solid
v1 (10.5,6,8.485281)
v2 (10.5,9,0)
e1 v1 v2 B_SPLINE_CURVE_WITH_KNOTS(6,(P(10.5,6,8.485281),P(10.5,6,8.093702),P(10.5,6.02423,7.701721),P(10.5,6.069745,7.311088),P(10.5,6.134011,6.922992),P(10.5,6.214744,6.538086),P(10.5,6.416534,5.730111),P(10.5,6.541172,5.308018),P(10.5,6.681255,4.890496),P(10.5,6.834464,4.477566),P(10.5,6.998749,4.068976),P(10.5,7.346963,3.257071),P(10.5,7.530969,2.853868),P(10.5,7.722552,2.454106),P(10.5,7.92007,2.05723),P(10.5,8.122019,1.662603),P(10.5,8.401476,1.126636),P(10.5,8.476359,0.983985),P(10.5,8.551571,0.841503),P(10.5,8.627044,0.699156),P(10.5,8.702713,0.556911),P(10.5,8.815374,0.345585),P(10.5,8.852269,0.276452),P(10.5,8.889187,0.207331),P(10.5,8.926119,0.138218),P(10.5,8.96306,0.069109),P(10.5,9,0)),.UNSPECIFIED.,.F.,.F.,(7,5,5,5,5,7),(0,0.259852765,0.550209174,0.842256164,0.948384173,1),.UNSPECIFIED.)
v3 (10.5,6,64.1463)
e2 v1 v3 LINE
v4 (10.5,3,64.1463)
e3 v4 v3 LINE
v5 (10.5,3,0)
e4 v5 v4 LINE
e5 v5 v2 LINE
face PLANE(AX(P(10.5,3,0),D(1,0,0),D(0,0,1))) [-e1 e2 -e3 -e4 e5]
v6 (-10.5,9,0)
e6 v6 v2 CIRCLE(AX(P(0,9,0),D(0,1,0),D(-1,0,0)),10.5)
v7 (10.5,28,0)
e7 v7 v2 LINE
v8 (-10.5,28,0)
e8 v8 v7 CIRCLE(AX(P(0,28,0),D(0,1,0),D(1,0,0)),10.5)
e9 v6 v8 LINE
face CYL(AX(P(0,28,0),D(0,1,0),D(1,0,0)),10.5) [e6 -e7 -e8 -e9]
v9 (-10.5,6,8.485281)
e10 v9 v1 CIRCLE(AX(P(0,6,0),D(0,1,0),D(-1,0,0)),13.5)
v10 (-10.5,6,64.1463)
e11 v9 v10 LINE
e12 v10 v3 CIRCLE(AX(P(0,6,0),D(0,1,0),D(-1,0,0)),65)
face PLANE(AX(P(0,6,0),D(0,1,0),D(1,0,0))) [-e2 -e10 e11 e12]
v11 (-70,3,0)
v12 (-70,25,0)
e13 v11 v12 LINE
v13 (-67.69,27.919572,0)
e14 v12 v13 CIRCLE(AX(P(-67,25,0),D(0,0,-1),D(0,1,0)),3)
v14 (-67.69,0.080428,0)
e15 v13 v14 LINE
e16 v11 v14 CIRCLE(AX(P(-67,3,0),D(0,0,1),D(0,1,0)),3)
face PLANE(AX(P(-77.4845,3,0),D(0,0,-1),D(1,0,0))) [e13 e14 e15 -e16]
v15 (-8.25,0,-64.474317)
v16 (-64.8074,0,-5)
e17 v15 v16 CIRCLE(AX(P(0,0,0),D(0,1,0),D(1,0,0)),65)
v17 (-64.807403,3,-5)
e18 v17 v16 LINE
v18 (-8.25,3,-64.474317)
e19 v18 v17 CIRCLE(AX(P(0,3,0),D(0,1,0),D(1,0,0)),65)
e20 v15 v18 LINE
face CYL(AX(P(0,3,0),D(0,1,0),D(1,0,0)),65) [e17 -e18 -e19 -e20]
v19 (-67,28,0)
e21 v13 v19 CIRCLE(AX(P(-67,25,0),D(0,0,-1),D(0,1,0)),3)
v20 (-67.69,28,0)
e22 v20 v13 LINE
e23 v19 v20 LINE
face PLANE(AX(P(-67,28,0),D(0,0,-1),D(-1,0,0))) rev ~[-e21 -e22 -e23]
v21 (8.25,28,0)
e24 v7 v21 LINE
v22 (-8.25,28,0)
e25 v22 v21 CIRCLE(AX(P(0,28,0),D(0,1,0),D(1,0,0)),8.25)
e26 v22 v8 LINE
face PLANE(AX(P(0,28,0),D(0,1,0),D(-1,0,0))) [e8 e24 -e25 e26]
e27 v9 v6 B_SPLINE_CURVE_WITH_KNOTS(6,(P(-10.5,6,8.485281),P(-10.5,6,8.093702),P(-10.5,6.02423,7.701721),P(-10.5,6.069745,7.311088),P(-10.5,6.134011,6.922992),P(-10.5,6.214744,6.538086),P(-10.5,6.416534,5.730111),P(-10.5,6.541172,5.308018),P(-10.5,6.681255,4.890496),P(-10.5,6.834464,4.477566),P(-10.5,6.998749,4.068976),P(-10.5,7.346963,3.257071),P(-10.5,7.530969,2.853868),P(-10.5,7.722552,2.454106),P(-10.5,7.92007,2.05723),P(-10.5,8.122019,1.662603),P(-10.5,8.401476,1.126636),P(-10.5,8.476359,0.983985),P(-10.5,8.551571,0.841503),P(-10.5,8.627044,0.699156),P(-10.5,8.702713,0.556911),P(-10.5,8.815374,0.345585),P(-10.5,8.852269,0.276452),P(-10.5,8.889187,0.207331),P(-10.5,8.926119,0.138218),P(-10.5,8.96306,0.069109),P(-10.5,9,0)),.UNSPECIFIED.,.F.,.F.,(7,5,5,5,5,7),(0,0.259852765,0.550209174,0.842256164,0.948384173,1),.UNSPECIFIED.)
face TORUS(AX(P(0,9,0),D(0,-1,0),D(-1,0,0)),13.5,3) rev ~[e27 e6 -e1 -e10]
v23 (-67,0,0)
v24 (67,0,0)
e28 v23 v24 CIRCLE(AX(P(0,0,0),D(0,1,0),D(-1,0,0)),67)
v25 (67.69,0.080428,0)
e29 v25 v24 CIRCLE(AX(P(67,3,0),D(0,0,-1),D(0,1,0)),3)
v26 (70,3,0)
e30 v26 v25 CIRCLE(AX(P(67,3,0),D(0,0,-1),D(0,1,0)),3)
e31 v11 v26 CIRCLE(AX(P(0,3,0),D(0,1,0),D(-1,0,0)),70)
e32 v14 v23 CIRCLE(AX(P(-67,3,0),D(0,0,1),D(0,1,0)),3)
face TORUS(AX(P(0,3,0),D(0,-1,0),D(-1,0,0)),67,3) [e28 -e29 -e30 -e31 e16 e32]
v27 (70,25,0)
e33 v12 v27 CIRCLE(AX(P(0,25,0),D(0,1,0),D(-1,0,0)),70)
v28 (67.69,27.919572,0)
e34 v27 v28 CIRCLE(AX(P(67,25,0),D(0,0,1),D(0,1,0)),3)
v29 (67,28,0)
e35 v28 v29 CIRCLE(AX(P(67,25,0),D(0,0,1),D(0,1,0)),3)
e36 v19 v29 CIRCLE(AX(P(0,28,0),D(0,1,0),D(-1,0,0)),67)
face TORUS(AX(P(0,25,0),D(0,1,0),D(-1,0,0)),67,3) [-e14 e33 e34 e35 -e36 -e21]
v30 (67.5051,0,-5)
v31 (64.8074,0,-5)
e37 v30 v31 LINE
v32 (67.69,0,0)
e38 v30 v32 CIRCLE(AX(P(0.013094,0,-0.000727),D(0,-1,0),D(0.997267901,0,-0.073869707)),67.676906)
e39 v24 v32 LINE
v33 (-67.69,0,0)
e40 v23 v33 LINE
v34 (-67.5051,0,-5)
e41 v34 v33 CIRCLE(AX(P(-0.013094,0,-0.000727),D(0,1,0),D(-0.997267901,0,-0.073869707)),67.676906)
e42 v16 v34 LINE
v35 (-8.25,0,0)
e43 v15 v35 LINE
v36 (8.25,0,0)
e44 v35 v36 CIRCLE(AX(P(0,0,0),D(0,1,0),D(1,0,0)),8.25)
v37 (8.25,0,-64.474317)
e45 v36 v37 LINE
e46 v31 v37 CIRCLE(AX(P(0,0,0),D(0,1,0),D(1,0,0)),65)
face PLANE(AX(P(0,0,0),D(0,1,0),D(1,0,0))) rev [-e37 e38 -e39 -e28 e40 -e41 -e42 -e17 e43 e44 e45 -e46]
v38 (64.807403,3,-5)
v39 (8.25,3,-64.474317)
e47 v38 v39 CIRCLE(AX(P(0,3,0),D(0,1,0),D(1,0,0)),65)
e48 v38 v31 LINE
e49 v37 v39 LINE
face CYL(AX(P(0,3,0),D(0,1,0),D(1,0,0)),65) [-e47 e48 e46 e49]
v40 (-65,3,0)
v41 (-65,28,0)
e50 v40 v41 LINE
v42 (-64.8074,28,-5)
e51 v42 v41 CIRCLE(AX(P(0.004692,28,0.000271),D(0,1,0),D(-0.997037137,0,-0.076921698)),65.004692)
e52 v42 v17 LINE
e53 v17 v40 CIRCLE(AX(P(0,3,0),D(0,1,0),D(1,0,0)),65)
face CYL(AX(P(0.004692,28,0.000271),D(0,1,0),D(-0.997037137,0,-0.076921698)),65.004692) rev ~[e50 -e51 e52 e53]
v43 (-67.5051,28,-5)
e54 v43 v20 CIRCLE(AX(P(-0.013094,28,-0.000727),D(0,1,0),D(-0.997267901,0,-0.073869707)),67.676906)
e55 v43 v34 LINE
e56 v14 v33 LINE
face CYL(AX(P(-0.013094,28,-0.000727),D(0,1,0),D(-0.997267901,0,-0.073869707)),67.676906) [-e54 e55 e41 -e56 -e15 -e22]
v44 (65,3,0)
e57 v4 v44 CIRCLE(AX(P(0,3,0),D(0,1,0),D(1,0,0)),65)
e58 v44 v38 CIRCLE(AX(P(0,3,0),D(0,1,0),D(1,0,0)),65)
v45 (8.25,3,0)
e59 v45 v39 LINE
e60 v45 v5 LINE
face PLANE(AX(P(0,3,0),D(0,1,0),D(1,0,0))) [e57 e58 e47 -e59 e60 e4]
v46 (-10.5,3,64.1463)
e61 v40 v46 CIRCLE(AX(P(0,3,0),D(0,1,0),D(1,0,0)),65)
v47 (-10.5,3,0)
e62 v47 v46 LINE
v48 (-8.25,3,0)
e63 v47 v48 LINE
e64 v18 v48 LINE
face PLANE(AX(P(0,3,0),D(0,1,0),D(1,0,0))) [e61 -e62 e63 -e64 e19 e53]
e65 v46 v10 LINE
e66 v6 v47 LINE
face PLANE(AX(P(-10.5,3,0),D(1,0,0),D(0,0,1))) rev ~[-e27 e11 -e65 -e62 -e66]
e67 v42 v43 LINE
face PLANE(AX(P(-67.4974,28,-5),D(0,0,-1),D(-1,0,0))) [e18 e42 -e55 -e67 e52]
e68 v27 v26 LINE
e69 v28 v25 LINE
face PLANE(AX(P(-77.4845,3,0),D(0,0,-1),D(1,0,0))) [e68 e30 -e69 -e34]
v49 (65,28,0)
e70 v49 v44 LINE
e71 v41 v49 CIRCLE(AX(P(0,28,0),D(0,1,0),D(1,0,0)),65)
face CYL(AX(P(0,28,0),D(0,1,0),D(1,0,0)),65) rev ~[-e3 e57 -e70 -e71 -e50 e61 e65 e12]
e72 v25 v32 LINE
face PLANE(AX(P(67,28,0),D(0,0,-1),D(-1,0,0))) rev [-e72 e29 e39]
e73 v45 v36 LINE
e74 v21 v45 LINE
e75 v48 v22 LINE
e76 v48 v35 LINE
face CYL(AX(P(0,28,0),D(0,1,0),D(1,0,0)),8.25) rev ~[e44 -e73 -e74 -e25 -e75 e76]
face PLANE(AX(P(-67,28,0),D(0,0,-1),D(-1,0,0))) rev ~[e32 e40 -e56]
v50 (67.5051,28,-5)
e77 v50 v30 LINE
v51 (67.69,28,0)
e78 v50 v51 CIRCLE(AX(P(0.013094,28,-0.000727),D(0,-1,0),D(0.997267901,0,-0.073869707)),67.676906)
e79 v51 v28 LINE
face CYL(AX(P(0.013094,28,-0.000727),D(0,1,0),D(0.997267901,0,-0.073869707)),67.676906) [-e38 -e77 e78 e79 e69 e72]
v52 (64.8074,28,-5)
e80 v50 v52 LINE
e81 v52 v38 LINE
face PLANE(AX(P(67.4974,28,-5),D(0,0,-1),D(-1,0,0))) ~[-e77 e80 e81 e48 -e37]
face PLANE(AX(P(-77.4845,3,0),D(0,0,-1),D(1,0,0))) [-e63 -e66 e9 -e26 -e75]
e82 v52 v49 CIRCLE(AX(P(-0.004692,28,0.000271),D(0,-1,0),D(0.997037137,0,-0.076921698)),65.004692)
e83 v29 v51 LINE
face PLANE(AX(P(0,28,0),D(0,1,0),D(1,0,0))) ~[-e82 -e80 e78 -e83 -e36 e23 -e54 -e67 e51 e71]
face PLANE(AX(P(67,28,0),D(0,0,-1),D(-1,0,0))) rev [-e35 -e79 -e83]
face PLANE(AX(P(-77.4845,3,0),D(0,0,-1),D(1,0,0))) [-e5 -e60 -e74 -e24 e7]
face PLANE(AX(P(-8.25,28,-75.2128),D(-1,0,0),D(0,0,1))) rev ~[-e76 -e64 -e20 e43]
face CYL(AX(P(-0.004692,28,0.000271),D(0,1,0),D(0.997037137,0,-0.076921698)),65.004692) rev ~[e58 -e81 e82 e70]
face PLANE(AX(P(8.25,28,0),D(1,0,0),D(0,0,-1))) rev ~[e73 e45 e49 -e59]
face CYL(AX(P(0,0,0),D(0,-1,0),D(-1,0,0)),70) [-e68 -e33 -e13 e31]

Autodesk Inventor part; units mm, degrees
ref_plane "YZ Plane" through (0, 0, 0) normal (1, 0, 0) x (0, 1, 0)
ref_plane "XZ Plane" through (0, 0, 0) normal (0, 1, 0) x (-1, 0, 0)
ref_plane "XY Plane" through (0, 0, 0) normal (0, 0, 1) x (1, 0, 0)
sketch "Sketch1" plane through (0, 0, 0) normal (0, 1, 0) x (-1, 0, 0)
  circle A0 centre (0, 0) radius 70
  dimension "d0" = 140
extrude "Extrusion1" add sketch "Sketch1" along normal blind 28
sketch "Sketch2" plane through (0, 28, 0) normal (0, 1, 0) x (1, 0, 0)
  circle A0 centre (0, 0) radius 8.25
  dimension "d3" = 16.5
extrude "Extrusion2" cut sketch "Sketch2" against normal blind 28
sketch "Sketch3" plane through (0, 28, 0) normal (0, 1, 0) x (1, 0, 0)
  circle A0 centre (0, 0) radius 8.25
  circle A1 centre (0, 0) radius 65
  circle A2 centre (0, 0) radius 10.5
  dimension "d6" = 130
  dimension "d7" = 21
extrude "Extrusion3" cut sketch "Sketch3" against normal blind 25 contours A1
sketch "Sketch4" plane through (0, 3, 0) normal (0, 1, 0) x (1, 0, 0)
  line L0 (-77.4845, 0) -> (88.5537, 0)
  line L1 (88.5537, 0) -> (88.5537, 100.8261)
  line L2 (88.5537, 100.8261) -> (-77.4845, 100.8261)
  line L3 (-77.4845, 100.8261) -> (-77.4845, 0)
  point P0 (0, 0)
  point P1 (0, 0)
extrude "Extrusion4" cut sketch "Sketch4" along normal blind 220
sketch "Sketch5" plane through (0, 3, 0) normal (0, 1, 0) x (1, 0, 0)
  arc A0 (-10.5, 0) -> (10.5, 0) centre (0, 0) ccw projected
  arc A1 (-65, 0) -> (65, 0) centre (0, 0) ccw projected
  arc A2 (-10.5, 0) -> (10.5, 0) centre (0, 0) ccw projected
  line L0 (10.5, 0) -> (10.5, -64.1463)
  line L1 (-10.5, 0) -> (-10.5, -64.1463)
  arc A3 (-10.5, -64.1463) -> (10.5, -64.1463) centre (0, 0) ccw
  arc A4 (-10.5, 0) -> (10.5, 0) centre (0, 0) ccw
extrude "Extrusion5" add sketch "Sketch5" along normal blind 3
sketch "Sketch6" plane through (0, 28, 0) normal (0, 1, 0) x (1, 0, 0)
  line L0 (-8.25, 0) -> (-10.5, 0) projected
  line L1 (-8.25, 0) -> (8.25, 0)
  line L2 (8.25, 0) -> (8.25, 75.2128)
  line L3 (8.25, 75.2128) -> (-8.25, 75.2128)
  line L4 (-8.25, 75.2128) -> (-8.25, 0)
  point P0 (0, 0)
  dimension "d14" = 16.5
extrude "Extrusion6" cut sketch "Sketch6" against normal blind 30
sketch "Sketch8" plane through (0, 3, 0) normal (0, 1, 0) x (1, 0, 0)
  arc A0 (-65, 0) -> (65, 0) centre (0, 0) ccw
  line L0 (65, 0) -> (70, 0)
  arc A1 (70, 0) -> (-70, 0) centre (0, 0) ccw
  line L1 (-70, 0) -> (-65, 0)
  arc A2 (-10.5, 0) -> (10.5, 0) centre (0, 0) ccw
  line L2 (-10.5, 0) -> (-8.25, 0)
  arc A3 (8.25, 0) -> (-8.25, 0) centre (0, 0) ccw
  line L3 (8.25, 0) -> (10.5, 0)
  circle A4 centre (0, 0) radius 8.25
  arc A5 (65, 0) -> (-65, 0) centre (0, 0) ccw
  line L4 (-65, 0) -> (-70, 0)
  line L5 (65, 0) -> (70, 0)
  arc A6 (70, 0) -> (-70, 0) centre (0, 0) ccw
  arc A7 (70, 0) -> (70, 0) centre (0, 0) ccw
extrude "Extrusion7" cut sketch "Sketch8" against normal blind 30 contours L1 A1 L0 A5
fillet "Fillet1" radius 3 1 edges at (0, 6, 10.5)
fillet "Fillet2" radius 3 1 edges at (0, 0, 70)
fillet "Fillet4" radius 3 1 edges at (0, 28, 70)
sketch "Sketch11" plane through (0, 28, 0) normal (0, 1, 0) x (1, 0, 0)
  line L0 (-65, 0) -> (-67.69, 0)
  line L1 (-64.8074, 5) -> (-67.4974, 5)
  arc A0 (-67.5051, 5) -> (-67.69, 0) centre (0, 0) ccw
  arc A1 (-64.8074, 5) -> (-65, 0) centre (0, 0) ccw
  line L2 (-65, 0) -> (-67.69, 0)
  line L3 (-70, 0) -> (-67, 0) projected
  line L4 (-64.8074, 5) -> (-67.5051, 5)
  dimension "d30" = 2.69
  dimension "d32" = 2.69
extrude "Extrusion10" add sketch "Sketch11" against normal blind 28
mirror "Mirror3" about plane through (0, 0, 0) normal (1, 0, 0) of "Extrusion10"
properties part number "casept2"
